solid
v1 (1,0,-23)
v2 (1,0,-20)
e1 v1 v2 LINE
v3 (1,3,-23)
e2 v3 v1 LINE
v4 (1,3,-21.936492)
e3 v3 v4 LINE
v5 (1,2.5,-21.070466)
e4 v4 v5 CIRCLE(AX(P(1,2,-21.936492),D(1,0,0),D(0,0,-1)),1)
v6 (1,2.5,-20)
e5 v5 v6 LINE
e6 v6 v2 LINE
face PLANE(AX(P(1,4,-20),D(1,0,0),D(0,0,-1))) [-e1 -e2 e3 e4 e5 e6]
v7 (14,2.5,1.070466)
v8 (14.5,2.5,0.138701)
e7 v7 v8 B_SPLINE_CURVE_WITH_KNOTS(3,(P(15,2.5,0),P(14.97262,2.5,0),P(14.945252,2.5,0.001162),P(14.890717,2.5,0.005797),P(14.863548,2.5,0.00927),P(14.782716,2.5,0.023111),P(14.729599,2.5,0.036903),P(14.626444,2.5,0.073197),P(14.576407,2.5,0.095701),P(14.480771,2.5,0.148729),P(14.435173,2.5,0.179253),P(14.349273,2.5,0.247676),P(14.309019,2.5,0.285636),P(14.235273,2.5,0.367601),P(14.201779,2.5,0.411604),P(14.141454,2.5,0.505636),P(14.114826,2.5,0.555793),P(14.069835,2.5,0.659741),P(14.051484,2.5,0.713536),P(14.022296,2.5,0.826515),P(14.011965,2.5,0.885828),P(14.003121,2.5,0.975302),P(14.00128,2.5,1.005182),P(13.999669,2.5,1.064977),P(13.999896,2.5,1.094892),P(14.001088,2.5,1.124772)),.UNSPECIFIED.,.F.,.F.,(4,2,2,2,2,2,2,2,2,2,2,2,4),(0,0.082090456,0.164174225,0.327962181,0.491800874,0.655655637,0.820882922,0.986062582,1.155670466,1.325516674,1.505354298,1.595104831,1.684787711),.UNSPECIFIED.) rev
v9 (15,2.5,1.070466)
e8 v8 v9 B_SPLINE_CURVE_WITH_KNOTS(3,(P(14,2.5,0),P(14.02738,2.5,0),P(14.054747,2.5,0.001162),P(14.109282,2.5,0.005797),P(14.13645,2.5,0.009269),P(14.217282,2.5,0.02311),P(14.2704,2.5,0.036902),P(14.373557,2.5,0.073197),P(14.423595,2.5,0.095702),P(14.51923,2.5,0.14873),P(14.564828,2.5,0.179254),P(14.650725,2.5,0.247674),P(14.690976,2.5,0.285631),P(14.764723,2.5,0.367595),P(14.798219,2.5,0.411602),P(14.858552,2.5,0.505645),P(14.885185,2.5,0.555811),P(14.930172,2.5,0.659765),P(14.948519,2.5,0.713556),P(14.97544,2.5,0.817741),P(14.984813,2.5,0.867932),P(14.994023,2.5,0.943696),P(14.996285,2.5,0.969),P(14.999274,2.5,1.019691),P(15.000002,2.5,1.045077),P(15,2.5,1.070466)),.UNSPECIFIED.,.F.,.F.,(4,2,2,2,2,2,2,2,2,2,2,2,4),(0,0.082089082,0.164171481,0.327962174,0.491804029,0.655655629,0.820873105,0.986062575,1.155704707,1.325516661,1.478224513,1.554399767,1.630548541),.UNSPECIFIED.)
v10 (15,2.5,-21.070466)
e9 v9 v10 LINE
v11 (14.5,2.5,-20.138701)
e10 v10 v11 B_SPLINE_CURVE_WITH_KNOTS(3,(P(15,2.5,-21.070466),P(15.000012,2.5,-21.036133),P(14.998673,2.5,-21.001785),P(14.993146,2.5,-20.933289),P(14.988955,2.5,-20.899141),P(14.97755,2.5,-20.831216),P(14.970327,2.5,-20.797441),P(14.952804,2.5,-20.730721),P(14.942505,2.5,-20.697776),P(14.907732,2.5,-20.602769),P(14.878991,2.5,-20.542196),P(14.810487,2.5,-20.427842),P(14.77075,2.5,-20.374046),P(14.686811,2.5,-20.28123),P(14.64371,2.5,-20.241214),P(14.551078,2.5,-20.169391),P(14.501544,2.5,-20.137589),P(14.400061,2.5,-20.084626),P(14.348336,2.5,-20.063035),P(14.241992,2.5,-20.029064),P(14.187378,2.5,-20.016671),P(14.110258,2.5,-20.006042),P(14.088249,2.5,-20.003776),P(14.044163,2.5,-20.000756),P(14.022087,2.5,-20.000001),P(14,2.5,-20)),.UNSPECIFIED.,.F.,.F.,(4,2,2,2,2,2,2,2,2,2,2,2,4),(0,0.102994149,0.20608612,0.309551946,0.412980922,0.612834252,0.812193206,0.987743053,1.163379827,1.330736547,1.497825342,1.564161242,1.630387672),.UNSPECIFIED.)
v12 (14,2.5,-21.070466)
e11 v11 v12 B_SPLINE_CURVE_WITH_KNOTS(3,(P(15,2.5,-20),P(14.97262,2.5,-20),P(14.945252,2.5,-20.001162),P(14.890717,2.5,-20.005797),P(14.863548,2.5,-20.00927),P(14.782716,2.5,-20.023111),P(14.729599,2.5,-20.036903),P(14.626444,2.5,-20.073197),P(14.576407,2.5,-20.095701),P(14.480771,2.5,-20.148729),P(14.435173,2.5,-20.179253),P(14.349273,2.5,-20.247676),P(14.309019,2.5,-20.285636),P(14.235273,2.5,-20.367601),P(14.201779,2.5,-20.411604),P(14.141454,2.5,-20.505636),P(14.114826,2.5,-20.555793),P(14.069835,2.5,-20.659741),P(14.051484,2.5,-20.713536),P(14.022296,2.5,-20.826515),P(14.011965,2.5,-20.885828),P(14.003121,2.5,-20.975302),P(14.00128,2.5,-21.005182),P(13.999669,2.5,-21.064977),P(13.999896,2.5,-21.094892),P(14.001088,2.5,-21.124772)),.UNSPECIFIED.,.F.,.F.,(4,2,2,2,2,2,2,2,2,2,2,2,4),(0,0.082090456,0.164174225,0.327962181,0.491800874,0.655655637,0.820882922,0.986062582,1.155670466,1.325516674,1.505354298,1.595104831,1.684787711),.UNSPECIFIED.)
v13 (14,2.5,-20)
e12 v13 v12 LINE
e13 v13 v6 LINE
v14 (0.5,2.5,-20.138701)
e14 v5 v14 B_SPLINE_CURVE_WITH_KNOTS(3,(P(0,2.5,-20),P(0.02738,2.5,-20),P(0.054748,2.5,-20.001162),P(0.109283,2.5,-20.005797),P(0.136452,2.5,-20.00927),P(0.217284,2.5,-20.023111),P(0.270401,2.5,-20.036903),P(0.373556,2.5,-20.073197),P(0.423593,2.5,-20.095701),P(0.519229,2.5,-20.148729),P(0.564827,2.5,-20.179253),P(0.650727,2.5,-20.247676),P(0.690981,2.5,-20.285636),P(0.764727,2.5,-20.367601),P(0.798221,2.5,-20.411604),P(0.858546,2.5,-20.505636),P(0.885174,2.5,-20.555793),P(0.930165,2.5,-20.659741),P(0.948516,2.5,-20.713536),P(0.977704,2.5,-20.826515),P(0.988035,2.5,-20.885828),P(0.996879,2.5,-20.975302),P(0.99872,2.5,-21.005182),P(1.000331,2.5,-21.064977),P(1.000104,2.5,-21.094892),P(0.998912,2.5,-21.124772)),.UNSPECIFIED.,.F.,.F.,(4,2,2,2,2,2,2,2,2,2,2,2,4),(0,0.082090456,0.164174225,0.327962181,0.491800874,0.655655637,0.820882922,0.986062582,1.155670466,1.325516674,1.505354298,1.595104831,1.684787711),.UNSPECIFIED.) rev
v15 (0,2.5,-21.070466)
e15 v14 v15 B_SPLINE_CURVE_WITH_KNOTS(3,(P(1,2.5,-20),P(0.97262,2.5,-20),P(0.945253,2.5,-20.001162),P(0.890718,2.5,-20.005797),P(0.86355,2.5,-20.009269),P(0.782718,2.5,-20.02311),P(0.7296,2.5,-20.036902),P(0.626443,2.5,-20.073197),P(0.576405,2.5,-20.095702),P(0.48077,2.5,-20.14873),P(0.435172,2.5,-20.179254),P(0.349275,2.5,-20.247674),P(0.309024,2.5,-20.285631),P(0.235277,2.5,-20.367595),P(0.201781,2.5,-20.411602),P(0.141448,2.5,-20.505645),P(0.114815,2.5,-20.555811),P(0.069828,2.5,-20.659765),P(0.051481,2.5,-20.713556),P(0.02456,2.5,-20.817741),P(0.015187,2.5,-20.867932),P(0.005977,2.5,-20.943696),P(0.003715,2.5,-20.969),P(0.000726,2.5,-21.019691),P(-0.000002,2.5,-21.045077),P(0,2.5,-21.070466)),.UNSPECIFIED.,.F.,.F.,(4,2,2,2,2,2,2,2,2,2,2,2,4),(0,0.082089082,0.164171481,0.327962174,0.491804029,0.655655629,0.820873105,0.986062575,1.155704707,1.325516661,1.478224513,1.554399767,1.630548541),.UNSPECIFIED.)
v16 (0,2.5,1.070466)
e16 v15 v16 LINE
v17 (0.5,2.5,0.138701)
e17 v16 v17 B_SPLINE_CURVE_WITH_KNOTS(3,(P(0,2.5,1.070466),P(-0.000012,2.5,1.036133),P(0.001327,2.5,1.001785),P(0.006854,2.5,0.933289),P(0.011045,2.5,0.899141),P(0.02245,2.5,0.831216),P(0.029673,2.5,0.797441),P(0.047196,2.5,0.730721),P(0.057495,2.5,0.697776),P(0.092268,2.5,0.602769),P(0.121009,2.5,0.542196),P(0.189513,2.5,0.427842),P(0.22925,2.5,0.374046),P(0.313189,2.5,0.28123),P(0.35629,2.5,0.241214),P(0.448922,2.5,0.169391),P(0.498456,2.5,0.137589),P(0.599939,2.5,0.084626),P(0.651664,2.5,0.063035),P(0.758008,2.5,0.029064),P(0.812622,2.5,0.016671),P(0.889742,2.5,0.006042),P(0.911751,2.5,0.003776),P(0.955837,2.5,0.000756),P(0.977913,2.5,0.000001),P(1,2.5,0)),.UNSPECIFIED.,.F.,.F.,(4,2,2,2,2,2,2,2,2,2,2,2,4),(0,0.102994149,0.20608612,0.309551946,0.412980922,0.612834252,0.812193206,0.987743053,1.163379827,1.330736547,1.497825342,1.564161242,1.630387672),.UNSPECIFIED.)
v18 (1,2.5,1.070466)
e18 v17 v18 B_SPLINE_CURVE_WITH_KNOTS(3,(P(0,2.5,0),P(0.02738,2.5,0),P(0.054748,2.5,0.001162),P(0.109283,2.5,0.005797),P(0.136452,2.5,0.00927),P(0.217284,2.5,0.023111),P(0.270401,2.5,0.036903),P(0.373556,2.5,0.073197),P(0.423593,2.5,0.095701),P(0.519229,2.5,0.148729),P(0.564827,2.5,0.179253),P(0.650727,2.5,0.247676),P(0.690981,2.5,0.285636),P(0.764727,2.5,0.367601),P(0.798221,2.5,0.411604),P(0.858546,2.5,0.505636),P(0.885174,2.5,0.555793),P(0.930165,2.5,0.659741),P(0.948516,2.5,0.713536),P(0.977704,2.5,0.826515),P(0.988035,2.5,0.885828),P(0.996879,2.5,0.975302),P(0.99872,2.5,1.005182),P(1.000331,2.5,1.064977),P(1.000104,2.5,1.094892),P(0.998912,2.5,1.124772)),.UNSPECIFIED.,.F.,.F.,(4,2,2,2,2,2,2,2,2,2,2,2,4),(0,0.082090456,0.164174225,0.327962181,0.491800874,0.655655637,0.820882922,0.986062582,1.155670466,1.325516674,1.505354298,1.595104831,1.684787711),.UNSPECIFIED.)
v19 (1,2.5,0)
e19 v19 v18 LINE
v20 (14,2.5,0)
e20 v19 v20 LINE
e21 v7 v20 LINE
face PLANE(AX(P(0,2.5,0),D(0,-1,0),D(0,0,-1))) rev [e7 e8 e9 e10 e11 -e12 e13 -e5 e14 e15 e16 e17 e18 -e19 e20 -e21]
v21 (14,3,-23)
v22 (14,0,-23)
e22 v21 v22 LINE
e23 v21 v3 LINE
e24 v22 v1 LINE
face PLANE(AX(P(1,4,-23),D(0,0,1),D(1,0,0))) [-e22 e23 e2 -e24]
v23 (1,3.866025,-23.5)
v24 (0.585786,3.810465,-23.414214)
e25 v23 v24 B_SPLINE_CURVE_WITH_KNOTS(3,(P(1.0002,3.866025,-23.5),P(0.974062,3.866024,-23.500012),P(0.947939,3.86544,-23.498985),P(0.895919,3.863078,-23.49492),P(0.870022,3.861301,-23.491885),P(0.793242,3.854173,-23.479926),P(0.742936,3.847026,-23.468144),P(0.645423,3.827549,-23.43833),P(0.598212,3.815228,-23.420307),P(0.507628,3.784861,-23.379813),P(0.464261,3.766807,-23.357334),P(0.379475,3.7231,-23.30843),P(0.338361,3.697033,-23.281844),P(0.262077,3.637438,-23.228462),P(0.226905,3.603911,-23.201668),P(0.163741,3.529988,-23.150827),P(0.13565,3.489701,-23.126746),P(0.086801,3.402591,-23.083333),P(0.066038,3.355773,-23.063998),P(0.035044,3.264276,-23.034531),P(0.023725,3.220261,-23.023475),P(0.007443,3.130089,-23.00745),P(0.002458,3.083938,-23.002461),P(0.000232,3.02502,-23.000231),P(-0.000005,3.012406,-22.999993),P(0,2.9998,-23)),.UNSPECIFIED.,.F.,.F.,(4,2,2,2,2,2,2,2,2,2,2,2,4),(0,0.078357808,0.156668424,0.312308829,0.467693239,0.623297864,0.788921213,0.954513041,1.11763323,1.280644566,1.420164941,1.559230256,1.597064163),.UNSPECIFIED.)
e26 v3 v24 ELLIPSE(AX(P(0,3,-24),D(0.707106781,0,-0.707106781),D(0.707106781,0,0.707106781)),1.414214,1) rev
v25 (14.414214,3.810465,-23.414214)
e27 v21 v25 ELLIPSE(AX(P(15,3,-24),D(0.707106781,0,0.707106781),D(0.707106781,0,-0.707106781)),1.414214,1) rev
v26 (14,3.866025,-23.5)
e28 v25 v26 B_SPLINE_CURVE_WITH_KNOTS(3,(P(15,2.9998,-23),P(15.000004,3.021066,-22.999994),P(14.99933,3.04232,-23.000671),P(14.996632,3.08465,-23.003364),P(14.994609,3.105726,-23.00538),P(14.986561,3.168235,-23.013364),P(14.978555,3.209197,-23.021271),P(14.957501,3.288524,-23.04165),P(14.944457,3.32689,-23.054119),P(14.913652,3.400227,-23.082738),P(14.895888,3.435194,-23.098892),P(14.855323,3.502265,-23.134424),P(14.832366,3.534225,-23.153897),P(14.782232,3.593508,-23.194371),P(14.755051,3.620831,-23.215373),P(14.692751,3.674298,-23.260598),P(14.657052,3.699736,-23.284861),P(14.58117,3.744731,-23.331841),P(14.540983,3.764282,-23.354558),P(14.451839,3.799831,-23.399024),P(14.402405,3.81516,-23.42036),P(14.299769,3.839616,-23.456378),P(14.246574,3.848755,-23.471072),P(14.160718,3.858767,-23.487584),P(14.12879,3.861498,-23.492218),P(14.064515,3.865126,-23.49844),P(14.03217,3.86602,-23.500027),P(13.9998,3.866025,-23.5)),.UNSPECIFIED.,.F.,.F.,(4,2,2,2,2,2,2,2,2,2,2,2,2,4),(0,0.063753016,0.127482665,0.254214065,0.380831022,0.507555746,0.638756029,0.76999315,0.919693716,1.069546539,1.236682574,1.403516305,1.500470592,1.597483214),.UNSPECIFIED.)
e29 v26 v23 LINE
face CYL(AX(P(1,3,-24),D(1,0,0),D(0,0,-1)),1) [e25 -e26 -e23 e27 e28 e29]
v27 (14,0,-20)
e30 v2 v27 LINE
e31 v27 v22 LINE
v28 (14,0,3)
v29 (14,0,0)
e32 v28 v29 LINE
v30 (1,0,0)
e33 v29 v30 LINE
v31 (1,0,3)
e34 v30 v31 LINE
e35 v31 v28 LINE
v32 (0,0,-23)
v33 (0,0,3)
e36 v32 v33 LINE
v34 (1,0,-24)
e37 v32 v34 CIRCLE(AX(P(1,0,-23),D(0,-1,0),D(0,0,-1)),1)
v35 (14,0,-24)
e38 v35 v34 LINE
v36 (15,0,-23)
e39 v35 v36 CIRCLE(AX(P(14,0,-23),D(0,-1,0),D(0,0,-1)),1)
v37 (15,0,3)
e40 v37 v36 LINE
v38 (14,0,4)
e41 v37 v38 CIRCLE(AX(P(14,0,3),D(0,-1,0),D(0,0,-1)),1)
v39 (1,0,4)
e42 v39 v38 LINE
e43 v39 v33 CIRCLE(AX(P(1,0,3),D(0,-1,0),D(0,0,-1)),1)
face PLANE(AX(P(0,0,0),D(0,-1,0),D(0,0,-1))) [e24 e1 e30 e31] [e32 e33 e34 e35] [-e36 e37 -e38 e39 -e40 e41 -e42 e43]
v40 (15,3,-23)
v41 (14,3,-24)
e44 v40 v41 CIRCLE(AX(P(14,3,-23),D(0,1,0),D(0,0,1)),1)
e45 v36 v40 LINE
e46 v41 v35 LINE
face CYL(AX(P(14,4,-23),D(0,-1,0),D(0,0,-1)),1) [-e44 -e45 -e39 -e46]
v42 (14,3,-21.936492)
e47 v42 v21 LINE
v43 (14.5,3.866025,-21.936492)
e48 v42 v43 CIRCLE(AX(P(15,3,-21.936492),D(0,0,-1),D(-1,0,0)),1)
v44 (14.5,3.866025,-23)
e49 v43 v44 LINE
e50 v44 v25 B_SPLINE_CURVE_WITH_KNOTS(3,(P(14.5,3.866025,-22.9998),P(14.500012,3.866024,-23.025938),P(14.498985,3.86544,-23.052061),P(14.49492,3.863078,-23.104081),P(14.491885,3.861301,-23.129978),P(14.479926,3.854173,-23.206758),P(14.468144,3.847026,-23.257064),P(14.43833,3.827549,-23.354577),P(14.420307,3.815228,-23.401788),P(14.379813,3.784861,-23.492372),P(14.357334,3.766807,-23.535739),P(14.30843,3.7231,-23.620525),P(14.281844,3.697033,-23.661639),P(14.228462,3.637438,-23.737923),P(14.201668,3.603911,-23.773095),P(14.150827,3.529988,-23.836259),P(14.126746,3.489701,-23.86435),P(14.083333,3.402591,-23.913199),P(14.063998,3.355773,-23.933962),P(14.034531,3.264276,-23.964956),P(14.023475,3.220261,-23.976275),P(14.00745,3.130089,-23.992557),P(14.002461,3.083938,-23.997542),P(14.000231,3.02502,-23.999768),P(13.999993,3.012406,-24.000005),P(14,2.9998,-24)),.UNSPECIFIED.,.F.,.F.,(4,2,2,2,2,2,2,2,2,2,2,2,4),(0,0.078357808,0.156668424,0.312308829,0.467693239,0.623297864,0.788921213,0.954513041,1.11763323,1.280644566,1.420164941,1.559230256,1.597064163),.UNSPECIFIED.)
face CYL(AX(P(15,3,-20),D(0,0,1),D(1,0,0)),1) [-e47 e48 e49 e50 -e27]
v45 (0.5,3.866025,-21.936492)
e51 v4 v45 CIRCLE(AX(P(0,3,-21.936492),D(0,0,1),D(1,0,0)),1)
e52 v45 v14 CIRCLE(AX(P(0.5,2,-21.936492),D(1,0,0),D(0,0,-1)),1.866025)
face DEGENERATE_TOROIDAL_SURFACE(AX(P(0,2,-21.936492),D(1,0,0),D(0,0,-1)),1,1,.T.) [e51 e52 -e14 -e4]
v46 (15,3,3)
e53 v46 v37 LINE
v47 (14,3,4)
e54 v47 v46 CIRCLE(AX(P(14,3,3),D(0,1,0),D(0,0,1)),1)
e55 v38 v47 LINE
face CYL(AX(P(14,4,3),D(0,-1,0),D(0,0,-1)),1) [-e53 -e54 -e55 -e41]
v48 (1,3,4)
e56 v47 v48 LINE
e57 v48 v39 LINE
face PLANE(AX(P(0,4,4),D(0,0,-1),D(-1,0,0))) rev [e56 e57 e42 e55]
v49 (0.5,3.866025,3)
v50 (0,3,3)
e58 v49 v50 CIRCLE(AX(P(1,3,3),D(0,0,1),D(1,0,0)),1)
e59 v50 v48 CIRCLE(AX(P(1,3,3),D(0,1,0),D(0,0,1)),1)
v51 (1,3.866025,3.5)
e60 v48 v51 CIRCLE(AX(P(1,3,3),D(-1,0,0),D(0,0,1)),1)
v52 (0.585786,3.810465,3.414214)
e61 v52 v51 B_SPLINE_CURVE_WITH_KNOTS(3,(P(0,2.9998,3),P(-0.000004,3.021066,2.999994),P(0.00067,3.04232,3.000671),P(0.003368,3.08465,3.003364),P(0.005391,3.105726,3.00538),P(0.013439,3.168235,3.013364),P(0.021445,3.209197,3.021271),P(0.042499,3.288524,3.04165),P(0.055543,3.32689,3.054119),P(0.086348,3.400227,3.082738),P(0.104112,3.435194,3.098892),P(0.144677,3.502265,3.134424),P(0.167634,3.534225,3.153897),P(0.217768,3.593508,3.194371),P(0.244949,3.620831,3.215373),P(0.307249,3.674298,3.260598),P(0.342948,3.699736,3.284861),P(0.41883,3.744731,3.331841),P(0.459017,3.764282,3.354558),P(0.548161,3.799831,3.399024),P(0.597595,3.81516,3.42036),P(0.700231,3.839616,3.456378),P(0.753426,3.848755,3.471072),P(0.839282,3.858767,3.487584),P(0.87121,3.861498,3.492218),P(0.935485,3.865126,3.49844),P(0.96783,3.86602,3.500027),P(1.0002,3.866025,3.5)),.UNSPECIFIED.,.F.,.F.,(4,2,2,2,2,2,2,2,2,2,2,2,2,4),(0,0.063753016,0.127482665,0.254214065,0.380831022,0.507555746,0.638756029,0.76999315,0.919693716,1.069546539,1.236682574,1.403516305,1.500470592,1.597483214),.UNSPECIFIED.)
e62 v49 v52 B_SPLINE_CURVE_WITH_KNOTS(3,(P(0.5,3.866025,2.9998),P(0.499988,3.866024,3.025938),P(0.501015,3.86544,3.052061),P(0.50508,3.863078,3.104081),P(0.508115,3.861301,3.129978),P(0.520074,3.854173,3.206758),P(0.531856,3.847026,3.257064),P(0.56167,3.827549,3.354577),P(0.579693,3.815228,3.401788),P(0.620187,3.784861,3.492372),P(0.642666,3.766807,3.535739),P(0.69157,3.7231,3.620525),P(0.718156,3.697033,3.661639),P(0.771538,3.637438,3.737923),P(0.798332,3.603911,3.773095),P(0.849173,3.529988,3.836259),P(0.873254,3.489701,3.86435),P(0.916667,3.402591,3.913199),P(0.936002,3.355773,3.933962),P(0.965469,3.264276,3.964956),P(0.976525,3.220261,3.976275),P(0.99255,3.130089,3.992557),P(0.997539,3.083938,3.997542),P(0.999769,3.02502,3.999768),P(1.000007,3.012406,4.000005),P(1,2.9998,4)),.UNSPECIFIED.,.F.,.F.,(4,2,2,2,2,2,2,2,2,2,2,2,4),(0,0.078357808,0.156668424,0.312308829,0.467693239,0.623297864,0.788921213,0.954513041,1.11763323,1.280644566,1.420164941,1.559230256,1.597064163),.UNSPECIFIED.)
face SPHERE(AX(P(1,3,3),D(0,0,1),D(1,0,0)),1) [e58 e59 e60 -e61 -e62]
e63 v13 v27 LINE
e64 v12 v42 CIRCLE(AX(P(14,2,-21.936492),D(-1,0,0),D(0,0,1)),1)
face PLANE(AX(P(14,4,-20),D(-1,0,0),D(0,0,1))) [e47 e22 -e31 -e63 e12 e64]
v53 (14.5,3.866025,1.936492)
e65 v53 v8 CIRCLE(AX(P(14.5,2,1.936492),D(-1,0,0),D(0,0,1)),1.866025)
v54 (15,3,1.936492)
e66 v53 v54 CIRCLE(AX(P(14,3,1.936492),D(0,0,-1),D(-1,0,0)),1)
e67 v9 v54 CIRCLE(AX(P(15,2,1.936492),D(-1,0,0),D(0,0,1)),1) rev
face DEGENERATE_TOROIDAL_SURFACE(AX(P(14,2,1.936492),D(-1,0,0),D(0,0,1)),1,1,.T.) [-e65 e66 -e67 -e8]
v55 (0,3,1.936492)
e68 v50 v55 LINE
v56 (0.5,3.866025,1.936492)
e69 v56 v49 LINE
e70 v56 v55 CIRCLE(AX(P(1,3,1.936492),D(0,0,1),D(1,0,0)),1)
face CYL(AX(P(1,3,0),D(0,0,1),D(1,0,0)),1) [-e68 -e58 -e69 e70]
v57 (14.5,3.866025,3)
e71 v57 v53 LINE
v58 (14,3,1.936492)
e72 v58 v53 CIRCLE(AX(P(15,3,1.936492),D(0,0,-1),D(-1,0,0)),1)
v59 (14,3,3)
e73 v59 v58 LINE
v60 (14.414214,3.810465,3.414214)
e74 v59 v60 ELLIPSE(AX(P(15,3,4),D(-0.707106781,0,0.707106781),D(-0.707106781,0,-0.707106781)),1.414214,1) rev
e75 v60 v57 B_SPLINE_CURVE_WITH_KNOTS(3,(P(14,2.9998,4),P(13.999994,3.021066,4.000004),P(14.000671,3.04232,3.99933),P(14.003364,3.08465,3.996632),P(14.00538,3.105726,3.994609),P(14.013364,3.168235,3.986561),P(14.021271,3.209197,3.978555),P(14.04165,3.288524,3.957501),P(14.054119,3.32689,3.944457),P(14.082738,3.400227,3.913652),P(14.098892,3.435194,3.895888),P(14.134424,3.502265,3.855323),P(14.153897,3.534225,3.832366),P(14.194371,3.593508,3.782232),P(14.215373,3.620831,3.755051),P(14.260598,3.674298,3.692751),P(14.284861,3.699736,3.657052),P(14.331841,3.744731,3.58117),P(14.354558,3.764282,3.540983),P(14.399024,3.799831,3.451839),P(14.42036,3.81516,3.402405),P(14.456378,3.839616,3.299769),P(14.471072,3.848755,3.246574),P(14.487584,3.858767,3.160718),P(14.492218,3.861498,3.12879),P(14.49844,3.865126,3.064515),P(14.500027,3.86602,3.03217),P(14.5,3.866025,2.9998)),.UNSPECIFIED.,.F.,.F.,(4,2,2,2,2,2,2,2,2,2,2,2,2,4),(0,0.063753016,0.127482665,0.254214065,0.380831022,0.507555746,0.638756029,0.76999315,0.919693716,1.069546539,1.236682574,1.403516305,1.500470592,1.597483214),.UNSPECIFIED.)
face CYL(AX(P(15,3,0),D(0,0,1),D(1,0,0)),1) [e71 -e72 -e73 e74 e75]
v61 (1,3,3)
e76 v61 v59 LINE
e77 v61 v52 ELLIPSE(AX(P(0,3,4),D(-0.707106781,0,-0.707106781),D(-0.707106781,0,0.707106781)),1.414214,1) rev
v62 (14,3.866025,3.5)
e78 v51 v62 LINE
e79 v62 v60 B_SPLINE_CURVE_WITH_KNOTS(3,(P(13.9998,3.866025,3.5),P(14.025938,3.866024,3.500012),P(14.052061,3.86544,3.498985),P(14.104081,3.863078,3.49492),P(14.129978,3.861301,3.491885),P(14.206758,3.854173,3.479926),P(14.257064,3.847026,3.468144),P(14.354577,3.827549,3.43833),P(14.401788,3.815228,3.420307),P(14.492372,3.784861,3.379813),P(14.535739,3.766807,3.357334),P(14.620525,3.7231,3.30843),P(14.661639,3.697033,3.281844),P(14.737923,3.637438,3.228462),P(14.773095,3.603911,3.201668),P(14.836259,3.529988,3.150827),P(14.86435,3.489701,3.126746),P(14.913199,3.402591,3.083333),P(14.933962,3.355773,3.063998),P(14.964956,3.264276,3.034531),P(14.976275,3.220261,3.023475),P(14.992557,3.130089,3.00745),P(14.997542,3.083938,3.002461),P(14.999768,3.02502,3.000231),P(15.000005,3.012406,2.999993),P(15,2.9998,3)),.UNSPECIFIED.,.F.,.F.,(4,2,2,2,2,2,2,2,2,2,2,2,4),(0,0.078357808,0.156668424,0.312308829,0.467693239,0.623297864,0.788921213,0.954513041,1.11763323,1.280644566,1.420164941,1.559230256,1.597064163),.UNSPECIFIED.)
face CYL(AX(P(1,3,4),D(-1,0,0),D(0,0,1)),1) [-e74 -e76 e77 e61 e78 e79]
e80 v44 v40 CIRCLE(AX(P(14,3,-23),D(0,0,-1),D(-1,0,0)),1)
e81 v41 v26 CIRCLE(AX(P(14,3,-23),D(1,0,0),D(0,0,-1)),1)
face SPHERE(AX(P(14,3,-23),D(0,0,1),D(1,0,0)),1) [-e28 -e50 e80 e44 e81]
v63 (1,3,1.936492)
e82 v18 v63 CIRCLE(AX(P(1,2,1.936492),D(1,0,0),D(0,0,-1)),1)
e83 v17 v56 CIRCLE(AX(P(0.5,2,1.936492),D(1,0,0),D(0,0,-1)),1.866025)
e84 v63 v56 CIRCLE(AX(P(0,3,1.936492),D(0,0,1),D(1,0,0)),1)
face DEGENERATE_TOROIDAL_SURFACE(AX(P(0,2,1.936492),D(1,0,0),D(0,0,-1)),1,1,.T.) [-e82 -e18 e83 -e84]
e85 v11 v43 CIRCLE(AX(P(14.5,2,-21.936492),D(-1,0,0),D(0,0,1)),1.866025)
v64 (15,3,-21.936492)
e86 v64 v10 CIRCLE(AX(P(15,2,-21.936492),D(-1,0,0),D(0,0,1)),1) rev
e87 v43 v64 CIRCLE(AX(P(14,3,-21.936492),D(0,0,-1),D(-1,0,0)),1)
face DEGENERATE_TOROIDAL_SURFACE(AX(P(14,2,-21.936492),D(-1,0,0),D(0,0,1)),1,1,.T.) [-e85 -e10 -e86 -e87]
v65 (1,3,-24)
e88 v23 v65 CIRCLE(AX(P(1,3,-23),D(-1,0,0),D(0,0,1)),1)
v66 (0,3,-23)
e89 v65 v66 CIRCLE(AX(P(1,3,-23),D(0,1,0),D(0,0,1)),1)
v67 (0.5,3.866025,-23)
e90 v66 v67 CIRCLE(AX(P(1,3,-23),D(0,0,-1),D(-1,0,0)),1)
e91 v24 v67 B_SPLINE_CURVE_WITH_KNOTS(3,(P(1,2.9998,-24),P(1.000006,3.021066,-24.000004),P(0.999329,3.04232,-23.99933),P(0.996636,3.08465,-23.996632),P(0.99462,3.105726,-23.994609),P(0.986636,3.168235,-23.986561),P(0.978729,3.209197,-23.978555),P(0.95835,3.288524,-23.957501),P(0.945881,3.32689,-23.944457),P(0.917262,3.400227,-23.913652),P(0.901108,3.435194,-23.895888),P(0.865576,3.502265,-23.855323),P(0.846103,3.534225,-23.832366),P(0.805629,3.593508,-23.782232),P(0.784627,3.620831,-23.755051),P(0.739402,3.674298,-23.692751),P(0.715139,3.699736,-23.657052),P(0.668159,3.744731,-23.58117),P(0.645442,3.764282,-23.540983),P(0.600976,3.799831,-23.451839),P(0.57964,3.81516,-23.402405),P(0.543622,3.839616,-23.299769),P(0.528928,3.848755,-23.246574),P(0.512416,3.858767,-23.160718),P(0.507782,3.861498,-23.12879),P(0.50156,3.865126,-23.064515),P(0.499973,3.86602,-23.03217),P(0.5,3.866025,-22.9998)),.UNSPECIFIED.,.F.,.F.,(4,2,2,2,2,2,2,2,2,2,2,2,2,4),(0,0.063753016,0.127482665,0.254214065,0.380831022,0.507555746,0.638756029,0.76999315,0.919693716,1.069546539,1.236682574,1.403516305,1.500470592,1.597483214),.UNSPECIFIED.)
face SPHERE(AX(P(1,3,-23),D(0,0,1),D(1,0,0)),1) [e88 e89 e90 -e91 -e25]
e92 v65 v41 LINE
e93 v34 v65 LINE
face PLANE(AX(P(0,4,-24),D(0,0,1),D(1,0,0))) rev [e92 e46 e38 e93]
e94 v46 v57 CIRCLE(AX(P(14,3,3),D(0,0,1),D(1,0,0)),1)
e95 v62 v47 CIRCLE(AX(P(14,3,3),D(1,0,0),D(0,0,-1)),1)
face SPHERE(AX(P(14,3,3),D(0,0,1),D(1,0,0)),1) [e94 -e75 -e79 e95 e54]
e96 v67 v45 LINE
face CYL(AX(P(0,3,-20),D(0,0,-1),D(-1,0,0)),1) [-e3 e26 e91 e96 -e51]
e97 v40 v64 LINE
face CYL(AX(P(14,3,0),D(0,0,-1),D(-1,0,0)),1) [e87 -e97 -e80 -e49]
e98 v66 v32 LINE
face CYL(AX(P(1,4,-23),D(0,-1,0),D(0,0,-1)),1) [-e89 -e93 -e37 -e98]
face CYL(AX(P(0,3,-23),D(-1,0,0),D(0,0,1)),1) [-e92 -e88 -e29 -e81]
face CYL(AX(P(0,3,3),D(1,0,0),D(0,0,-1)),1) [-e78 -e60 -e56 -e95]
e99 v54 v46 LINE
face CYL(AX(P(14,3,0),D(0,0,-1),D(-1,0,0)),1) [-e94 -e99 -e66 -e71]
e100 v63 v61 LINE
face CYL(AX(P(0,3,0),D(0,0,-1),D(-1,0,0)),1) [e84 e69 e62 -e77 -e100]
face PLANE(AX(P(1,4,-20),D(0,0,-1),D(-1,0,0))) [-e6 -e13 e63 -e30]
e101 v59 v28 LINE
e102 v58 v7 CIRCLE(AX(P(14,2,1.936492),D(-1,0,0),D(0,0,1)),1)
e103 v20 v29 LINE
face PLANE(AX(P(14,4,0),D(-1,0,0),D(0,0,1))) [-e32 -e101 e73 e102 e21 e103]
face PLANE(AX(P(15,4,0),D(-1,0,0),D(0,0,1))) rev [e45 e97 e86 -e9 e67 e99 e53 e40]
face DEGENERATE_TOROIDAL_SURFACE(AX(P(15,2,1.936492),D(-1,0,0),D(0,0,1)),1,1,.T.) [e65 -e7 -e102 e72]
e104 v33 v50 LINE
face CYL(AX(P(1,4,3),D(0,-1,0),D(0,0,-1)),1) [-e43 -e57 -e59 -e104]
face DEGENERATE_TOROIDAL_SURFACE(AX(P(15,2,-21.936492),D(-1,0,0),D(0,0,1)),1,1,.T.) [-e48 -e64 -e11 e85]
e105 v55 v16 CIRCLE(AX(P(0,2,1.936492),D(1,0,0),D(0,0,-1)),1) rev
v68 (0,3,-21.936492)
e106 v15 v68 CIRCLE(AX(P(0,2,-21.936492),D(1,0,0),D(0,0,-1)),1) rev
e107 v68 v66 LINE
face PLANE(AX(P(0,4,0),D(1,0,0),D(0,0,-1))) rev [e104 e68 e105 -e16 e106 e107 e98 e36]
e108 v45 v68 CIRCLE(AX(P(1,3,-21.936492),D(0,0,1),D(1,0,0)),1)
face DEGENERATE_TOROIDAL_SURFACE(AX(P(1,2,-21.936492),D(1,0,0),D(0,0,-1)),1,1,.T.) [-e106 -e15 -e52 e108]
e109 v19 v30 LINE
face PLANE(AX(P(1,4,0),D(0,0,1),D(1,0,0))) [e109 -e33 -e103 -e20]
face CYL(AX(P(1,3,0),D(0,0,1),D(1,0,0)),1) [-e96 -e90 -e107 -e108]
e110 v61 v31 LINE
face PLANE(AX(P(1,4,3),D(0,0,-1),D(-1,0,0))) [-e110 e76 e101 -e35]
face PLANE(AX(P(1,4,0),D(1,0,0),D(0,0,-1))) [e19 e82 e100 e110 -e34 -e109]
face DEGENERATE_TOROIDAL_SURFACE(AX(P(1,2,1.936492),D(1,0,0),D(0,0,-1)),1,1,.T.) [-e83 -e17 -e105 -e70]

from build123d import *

# Parameters (mm, degrees)
SKETCH1_W           = 13
SKETCH1_H           = 3
BOSS_EXTRUDE1_DEPTH = 4
SKETCH2_W           = 15
SKETCH2_H           = 20
CUT_EXTRUDE1_DEPTH  = 1.5
FILLET1_R           = 2
FILLET2_R           = 1


with BuildPart() as part:
    # Sketch1 → Boss-Extrude1 (new body)
    with BuildSketch(Plane(origin=(0, 0, 0), x_dir=(1, 0, 0), z_dir=(0, 1, 0))):
        Polygon((0, 0), (0, 20), (0, 24), (15, 24), (15, 20), (15, 0), (15, -4), (0, -4), align=None)
        with Locations((7.5, 21.5)):
            Rectangle(SKETCH1_W, SKETCH1_H, mode=Mode.SUBTRACT)
        with Locations((7.5, -1.5)):
            Rectangle(SKETCH1_W, SKETCH1_H, mode=Mode.SUBTRACT)
    extrude(amount=BOSS_EXTRUDE1_DEPTH)

    # Sketch2 → Cut-Extrude1 (cut)
    with BuildSketch(Plane(origin=(0, 4, 0), x_dir=(1, 0, 0), z_dir=(0, 1, 0))):
        with Locations((7.5, 10)):
            Rectangle(SKETCH2_W, SKETCH2_H)
    extrude(amount=-CUT_EXTRUDE1_DEPTH, mode=Mode.SUBTRACT)

    # Fillet1
    # the kernel refuses this fillet: 2 mm, written as the material it takes off along each edge
    with BuildSketch(Plane(origin=(-4.841229183, 4, 0), x_dir=(0, -1, 0), z_dir=(1, 0, 0))) as fillet1_piece_1:
        with BuildLine():
            CenterArc((2, -1.936491673), FILLET1_R, 104.477512186, 75.522487814)
            Line((0, -1.936491673), (-0.04, -1.936491673))
            Line((-0.04, -1.936491673), (-0.04, 0))
            Line((-0.04, 0), (0, 0.04))
            ThreePointArc((0, 0.04), (0.75, 0.04), (1.49, 0.038729833))
            Line((1.49, 0.038729833), (1.5, 0))
        make_face()
    extrude(amount=10.682458366, mode=Mode.SUBTRACT)
    with BuildSketch(Plane(origin=(9.158770817, 4, 0), x_dir=(0, 0, 1), z_dir=(1, 0, 0)), Plane(origin=(19.841229183, 4, -20), x_dir=(0, 0, -1), z_dir=(-1, 0, 0)), Plane(origin=(5.841229183, 4, -20), x_dir=(0, 0, -1), z_dir=(-1, 0, 0))) as fillet1_piece_2:
        with BuildLine():
            CenterArc((1.936491673, 2), FILLET1_R, 194.477512186, 75.522487814)
            Line((0, 1.5), (-0.038729833, 1.49))
            ThreePointArc((-0.038729833, 1.49), (-0.04, 0.75), (-0.04, 0))
            Line((-0.04, 0), (0, -0.04))
            Line((0, -0.04), (1.936491673, -0.04))
            Line((1.936491673, -0.04), (1.936491673, 0))
        make_face()
    extrude(amount=10.682458366, mode=Mode.SUBTRACT)

    # Fillet2
    # the kernel refuses this fillet: 1 mm, written as the material it takes off along each edge
    with BuildSketch(Plane(origin=(14, 3, 3), x_dir=(0, 0, 1), z_dir=(1, 0, 0))) as fillet2_piece_1_section:
        Polygon((0, 0), (FILLET2_R * 1.02, 0), (FILLET2_R * 1.02, -FILLET2_R * 1.02), (0, -FILLET2_R * 1.02), align=None)
    fillet2_piece_1 = extrude(amount=FILLET2_R * 1.02, mode=Mode.PRIVATE)
    fillet2_piece_1 = fillet2_piece_1 - Plane(origin=(14, 3, 3), x_dir=(0, -0.7071067811865475, -0.7071067811865475), z_dir=(1, 0, 0)) * Sphere(FILLET2_R, mode=Mode.PRIVATE)
    add(fillet2_piece_1, mode=Mode.SUBTRACT)
    with BuildSketch(Plane(origin=(1, 3, 3), x_dir=(0, 0, 1), z_dir=(-1, 0, 0))) as fillet2_piece_2_section:
        Polygon((0, 0), (FILLET2_R * 1.02, 0), (FILLET2_R * 1.02, FILLET2_R * 1.02), (0, FILLET2_R * 1.02), align=None)
    fillet2_piece_2 = extrude(amount=FILLET2_R * 1.02, mode=Mode.PRIVATE)
    fillet2_piece_2 = fillet2_piece_2 - Plane(origin=(1, 3, 3), x_dir=(0, -0.7071067811865475, -0.7071067811865475), z_dir=(-1, 0, 0)) * Sphere(FILLET2_R, mode=Mode.PRIVATE)
    add(fillet2_piece_2, mode=Mode.SUBTRACT)
    with BuildSketch(Plane(origin=(1, 3, -23), x_dir=(0, 1, 0), z_dir=(-1, 0, 0))) as fillet2_piece_3_section:
        Polygon((0, 0), (FILLET2_R * 1.02, 0), (FILLET2_R * 1.02, FILLET2_R * 1.02), (0, FILLET2_R * 1.02), align=None)
    fillet2_piece_3 = extrude(amount=FILLET2_R * 1.02, mode=Mode.PRIVATE)
    fillet2_piece_3 = fillet2_piece_3 - Plane(origin=(1, 3, -23), x_dir=(0, -0.7071067811865475, 0.7071067811865475), z_dir=(-1, 0, 0)) * Sphere(FILLET2_R, mode=Mode.PRIVATE)
    add(fillet2_piece_3, mode=Mode.SUBTRACT)
    with BuildSketch(Plane(origin=(14, 3, -23), x_dir=(0, 0, -1), z_dir=(0, 1, 0))) as fillet2_piece_4_section:
        Polygon((0, 0), (FILLET2_R * 1.02, 0), (FILLET2_R * 1.02, -FILLET2_R * 1.02), (0, -FILLET2_R * 1.02), align=None)
    fillet2_piece_4 = extrude(amount=FILLET2_R * 1.02, mode=Mode.PRIVATE)
    fillet2_piece_4 = fillet2_piece_4 - Plane(origin=(14, 3, -23), x_dir=(-0.7071067811865475, 0, 0.7071067811865475), z_dir=(0, 1, 0)) * Sphere(FILLET2_R, mode=Mode.PRIVATE)
    add(fillet2_piece_4, mode=Mode.SUBTRACT)
    with BuildSketch(Plane(origin=(14, 2, 1.936491673), x_dir=(0, 1, 0), z_dir=(0, 0, 1))) as fillet2_piece_5_section:
        with BuildLine():
            CenterArc((2 - FILLET2_R, -FILLET2_R), FILLET2_R, 0, 90)
            Line((2, -FILLET2_R), (2 + FILLET2_R * 0.02, -FILLET2_R))
            Line((2 + FILLET2_R * 0.02, -FILLET2_R), (2 + FILLET2_R * 0.02, FILLET2_R * 0.02))
            Line((2 + FILLET2_R * 0.02, FILLET2_R * 0.02), (2 - FILLET2_R, FILLET2_R * 0.02))
            Line((2 - FILLET2_R, FILLET2_R * 0.02), (2 - FILLET2_R, 0))
        make_face()
    fillet2_piece_5 = revolve(axis=Axis((14, 2, 1.936491673), (-1, 0, 0)), revolution_arc=147.162469187, mode=Mode.PRIVATE)
    fillet2_piece_5 = split(fillet2_piece_5, bisect_by=Plane(origin=(14.245105453, 3.345971108, 0), z_dir=(0, 0, 1)), keep=Keep.TOP, mode=Mode.PRIVATE)
    fillet2_piece_5 = split(fillet2_piece_5, bisect_by=Plane(origin=(14.245105453, 2.5, 0.926068322), z_dir=(0, 1, 0)), keep=Keep.TOP, mode=Mode.PRIVATE)
    add(fillet2_piece_5, mode=Mode.SUBTRACT)
    with BuildSketch(Plane(origin=(15, 2, 1.936491673), x_dir=(0, 1, 0), z_dir=(0, 0, 1))) as fillet2_piece_6_section:
        with BuildLine():
            CenterArc((2 - FILLET2_R, FILLET2_R), FILLET2_R, 270, 90)
            Line((2 - FILLET2_R, 0), (2 - FILLET2_R, -FILLET2_R * 0.02))
            Line((2 - FILLET2_R, -FILLET2_R * 0.02), (2 + FILLET2_R * 0.02, -FILLET2_R * 0.02))
            Line((2 + FILLET2_R * 0.02, -FILLET2_R * 0.02), (2 + FILLET2_R * 0.02, FILLET2_R))
            Line((2 + FILLET2_R * 0.02, FILLET2_R), (2, FILLET2_R))
        make_face()
    fillet2_piece_6 = revolve(axis=Axis((15, 2, 1.936491673), (-1, 0, 0)), revolution_arc=147.162469187, mode=Mode.PRIVATE)
    fillet2_piece_6 = split(fillet2_piece_6, bisect_by=Plane(origin=(14.754554239, 2.5, 0.924771773), z_dir=(0, 1, 0)), keep=Keep.TOP, mode=Mode.PRIVATE)
    add(fillet2_piece_6, mode=Mode.SUBTRACT)
    with BuildSketch(Plane(origin=(0, 2, 1.936491673), x_dir=(0, 1, 0), z_dir=(0, 0, 1))) as fillet2_piece_7_section:
        with BuildLine():
            CenterArc((2 - FILLET2_R, -FILLET2_R), FILLET2_R, 0, 90)
            Line((2, -FILLET2_R), (2 + FILLET2_R * 0.02, -FILLET2_R))
            Line((2 + FILLET2_R * 0.02, -FILLET2_R), (2 + FILLET2_R * 0.02, FILLET2_R * 0.02))
            Line((2 + FILLET2_R * 0.02, FILLET2_R * 0.02), (2 - FILLET2_R, FILLET2_R * 0.02))
            Line((2 - FILLET2_R, FILLET2_R * 0.02), (2 - FILLET2_R, 0))
        make_face()
    fillet2_piece_7 = revolve(axis=Axis((0, 2, 1.936491673), (-1, 0, 0)), revolution_arc=147.162469187, mode=Mode.PRIVATE)
    fillet2_piece_7 = split(fillet2_piece_7, bisect_by=Plane(origin=(0.245445759, 2.5, 0.924771781), z_dir=(0, 1, 0)), keep=Keep.TOP, mode=Mode.PRIVATE)
    add(fillet2_piece_7, mode=Mode.SUBTRACT)
    with BuildSketch(Plane(origin=(1, 2, 1.936491673), x_dir=(0, 1, 0), z_dir=(0, 0, 1))) as fillet2_piece_8_section:
        with BuildLine():
            CenterArc((2 - FILLET2_R, FILLET2_R), FILLET2_R, 270, 90)
            Line((2, FILLET2_R), (2 + FILLET2_R * 0.02, FILLET2_R))
            Line((2 + FILLET2_R * 0.02, FILLET2_R), (2 + FILLET2_R * 0.02, -FILLET2_R * 0.02))
            Line((2 + FILLET2_R * 0.02, -FILLET2_R * 0.02), (2 - FILLET2_R, -FILLET2_R * 0.02))
            Line((2 - FILLET2_R, -FILLET2_R * 0.02), (2 - FILLET2_R, 0))
        make_face()
    fillet2_piece_8 = revolve(axis=Axis((1, 2, 1.936491673), (-1, 0, 0)), revolution_arc=147.162469187, mode=Mode.PRIVATE)
    fillet2_piece_8 = split(fillet2_piece_8, bisect_by=Plane(origin=(0.754894544, 3.345971097, 0), z_dir=(0, 0, 1)), keep=Keep.TOP, mode=Mode.PRIVATE)
    fillet2_piece_8 = split(fillet2_piece_8, bisect_by=Plane(origin=(0.754894544, 2.5, 0.926068314), z_dir=(0, 1, 0)), keep=Keep.TOP, mode=Mode.PRIVATE)
    add(fillet2_piece_8, mode=Mode.SUBTRACT)
    with BuildSketch(Plane(origin=(1, 2, -21.936491673), x_dir=(0, 1, 0), z_dir=(0, 0, -1))) as fillet2_piece_9_section:
        with BuildLine():
            CenterArc((2 - FILLET2_R, -FILLET2_R), FILLET2_R, 0, 90)
            Line((2, -FILLET2_R), (2 + FILLET2_R * 0.02, -FILLET2_R))
            Line((2 + FILLET2_R * 0.02, -FILLET2_R), (2 + FILLET2_R * 0.02, FILLET2_R * 0.02))
            Line((2 + FILLET2_R * 0.02, FILLET2_R * 0.02), (2 - FILLET2_R, FILLET2_R * 0.02))
            Line((2 - FILLET2_R, FILLET2_R * 0.02), (2 - FILLET2_R, 0))
        make_face()
    fillet2_piece_9 = revolve(axis=Axis((1, 2, -21.936491673), (1, 0, 0)), revolution_arc=147.162469187, mode=Mode.PRIVATE)
    fillet2_piece_9 = split(fillet2_piece_9, bisect_by=Plane(origin=(0.754894544, 3.345971097, -20), z_dir=(0, 0, -1)), keep=Keep.TOP, mode=Mode.PRIVATE)
    fillet2_piece_9 = split(fillet2_piece_9, bisect_by=Plane(origin=(0.754894544, 2.5, -20.926068314), z_dir=(0, 1, 0)), keep=Keep.TOP, mode=Mode.PRIVATE)
    add(fillet2_piece_9, mode=Mode.SUBTRACT)
    with BuildSketch(Plane(origin=(0, 2, -21.936491673), x_dir=(0, 1, 0), z_dir=(0, 0, -1))) as fillet2_piece_10_section:
        with BuildLine():
            CenterArc((2 - FILLET2_R, FILLET2_R), FILLET2_R, 270, 90)
            Line((2, FILLET2_R), (2 + FILLET2_R * 0.02, FILLET2_R))
            Line((2 + FILLET2_R * 0.02, FILLET2_R), (2 + FILLET2_R * 0.02, -FILLET2_R * 0.02))
            Line((2 + FILLET2_R * 0.02, -FILLET2_R * 0.02), (2 - FILLET2_R, -FILLET2_R * 0.02))
            Line((2 - FILLET2_R, -FILLET2_R * 0.02), (2 - FILLET2_R, 0))
        make_face()
    fillet2_piece_10 = revolve(axis=Axis((0, 2, -21.936491673), (1, 0, 0)), revolution_arc=147.162469187, mode=Mode.PRIVATE)
    fillet2_piece_10 = split(fillet2_piece_10, bisect_by=Plane(origin=(0.245445759, 2.5, -20.924771781), z_dir=(0, 1, 0)), keep=Keep.TOP, mode=Mode.PRIVATE)
    add(fillet2_piece_10, mode=Mode.SUBTRACT)
    with BuildSketch(Plane(origin=(15, 2, -21.936491673), x_dir=(0, 1, 0), z_dir=(0, 0, -1))) as fillet2_piece_11_section:
        with BuildLine():
            CenterArc((2 - FILLET2_R, -FILLET2_R), FILLET2_R, 0, 90)
            Line((2 - FILLET2_R, 0), (2 - FILLET2_R, FILLET2_R * 0.02))
            Line((2 - FILLET2_R, FILLET2_R * 0.02), (2 + FILLET2_R * 0.02, FILLET2_R * 0.02))
            Line((2 + FILLET2_R * 0.02, FILLET2_R * 0.02), (2 + FILLET2_R * 0.02, -FILLET2_R))
            Line((2 + FILLET2_R * 0.02, -FILLET2_R), (2, -FILLET2_R))
        make_face()
    fillet2_piece_11 = revolve(axis=Axis((15, 2, -21.936491673), (1, 0, 0)), revolution_arc=147.162469187, mode=Mode.PRIVATE)
    fillet2_piece_11 = split(fillet2_piece_11, bisect_by=Plane(origin=(14.754554239, 2.5, -20.924771773), z_dir=(0, 1, 0)), keep=Keep.TOP, mode=Mode.PRIVATE)
    add(fillet2_piece_11, mode=Mode.SUBTRACT)
    with BuildSketch(Plane(origin=(14, 2, -21.936491673), x_dir=(0, 1, 0), z_dir=(0, 0, -1))) as fillet2_piece_12_section:
        with BuildLine():
            CenterArc((2 - FILLET2_R, FILLET2_R), FILLET2_R, 270, 90)
            Line((2, FILLET2_R), (2 + FILLET2_R * 0.02, FILLET2_R))
            Line((2 + FILLET2_R * 0.02, FILLET2_R), (2 + FILLET2_R * 0.02, -FILLET2_R * 0.02))
            Line((2 + FILLET2_R * 0.02, -FILLET2_R * 0.02), (2 - FILLET2_R, -FILLET2_R * 0.02))
            Line((2 - FILLET2_R, -FILLET2_R * 0.02), (2 - FILLET2_R, 0))
        make_face()
    fillet2_piece_12 = revolve(axis=Axis((14, 2, -21.936491673), (1, 0, 0)), revolution_arc=147.162469187, mode=Mode.PRIVATE)
    fillet2_piece_12 = split(fillet2_piece_12, bisect_by=Plane(origin=(14.245105453, 3.345971108, -20), z_dir=(0, 0, -1)), keep=Keep.TOP, mode=Mode.PRIVATE)
    fillet2_piece_12 = split(fillet2_piece_12, bisect_by=Plane(origin=(14.245105453, 2.5, -20.926068322), z_dir=(0, 1, 0)), keep=Keep.TOP, mode=Mode.PRIVATE)
    add(fillet2_piece_12, mode=Mode.SUBTRACT)
    with BuildSketch(Plane(origin=(14, 4, 3), x_dir=(0, -1, 0), z_dir=(-1, 0, 0)), Plane(origin=(1, 4, -23), x_dir=(0, -1, 0), z_dir=(1, 0, 0)), Plane(origin=(1, 4, -24), x_dir=(0, 0, 1), z_dir=(1, 0, 0))) as fillet2_piece_13:
        with BuildLine():
            CenterArc((FILLET2_R, FILLET2_R), FILLET2_R, 180, 90)
            Line((0, FILLET2_R), (-FILLET2_R * 0.02, FILLET2_R))
            Line((-FILLET2_R * 0.02, FILLET2_R), (-FILLET2_R * 0.02, -FILLET2_R * 0.02))
            Line((-FILLET2_R * 0.02, -FILLET2_R * 0.02), (FILLET2_R, -FILLET2_R * 0.02))
            Line((FILLET2_R, -FILLET2_R * 0.02), (FILLET2_R, 0))
        make_face()
    extrude(amount=13, mode=Mode.SUBTRACT)
    with BuildSketch(Plane(origin=(14, 4, 1.936491673), x_dir=(0, -1, 0), z_dir=(0, 0, 1)), Plane(origin=(1, 4, 3), x_dir=(0, -1, 0), z_dir=(0, 0, -1)), Plane(origin=(1, 4, -21.936491673), x_dir=(0, -1, 0), z_dir=(0, 0, -1)), Plane(origin=(14, 4, -23), x_dir=(0, -1, 0), z_dir=(0, 0, 1))) as fillet2_piece_14:
        with BuildLine():
            CenterArc((FILLET2_R, FILLET2_R), FILLET2_R, 180, 90)
            Line((0, FILLET2_R), (-FILLET2_R * 0.02, FILLET2_R))
            Line((-FILLET2_R * 0.02, FILLET2_R), (-FILLET2_R * 0.02, -FILLET2_R * 0.02))
            Line((-FILLET2_R * 0.02, -FILLET2_R * 0.02), (FILLET2_R, -FILLET2_R * 0.02))
            Line((FILLET2_R, -FILLET2_R * 0.02), (FILLET2_R, 0))
        make_face()
    extrude(amount=1.063508327, mode=Mode.SUBTRACT)
    with BuildSketch(Plane(origin=(15, 4, 1.936491673), x_dir=(0, -1, 0), z_dir=(0, 0, 1)), Plane(origin=(0, 4, 3), x_dir=(0, -1, 0), z_dir=(0, 0, -1)), Plane(origin=(0, 4, -21.936491673), x_dir=(0, -1, 0), z_dir=(0, 0, -1)), Plane(origin=(15, 4, -23), x_dir=(0, -1, 0), z_dir=(0, 0, 1))) as fillet2_piece_15:
        with BuildLine():
            CenterArc((FILLET2_R, -FILLET2_R), FILLET2_R, 90, 90)
            Line((0, -FILLET2_R), (-FILLET2_R * 0.02, -FILLET2_R))
            Line((-FILLET2_R * 0.02, -FILLET2_R), (-FILLET2_R * 0.02, FILLET2_R * 0.02))
            Line((-FILLET2_R * 0.02, FILLET2_R * 0.02), (FILLET2_R, FILLET2_R * 0.02))
            Line((FILLET2_R, FILLET2_R * 0.02), (FILLET2_R, 0))
        make_face()
    extrude(amount=1.063508327, mode=Mode.SUBTRACT)
    with BuildSketch(Plane(origin=(14, 4, 4), x_dir=(0, -1, 0), z_dir=(-1, 0, 0))) as fillet2_piece_16:
        with BuildLine():
            CenterArc((FILLET2_R, -FILLET2_R), FILLET2_R, 90, 90)
            Line((0, -FILLET2_R), (-FILLET2_R * 0.02, -FILLET2_R))
            Line((-FILLET2_R * 0.02, -FILLET2_R), (-FILLET2_R * 0.02, FILLET2_R * 0.02))
            Line((-FILLET2_R * 0.02, FILLET2_R * 0.02), (FILLET2_R, FILLET2_R * 0.02))
            Line((FILLET2_R, FILLET2_R * 0.02), (FILLET2_R, 0))
        make_face()
    extrude(amount=13, mode=Mode.SUBTRACT)
    with BuildSketch(Plane(origin=(0, 0, -24), x_dir=(0, 0, 1), z_dir=(0, 1, 0)), Plane(origin=(15, 0, 4), x_dir=(0, 0, -1), z_dir=(0, 1, 0))) as fillet2_piece_17:
        with BuildLine():
            CenterArc((FILLET2_R, FILLET2_R), FILLET2_R, 180, 90)
            Line((0, FILLET2_R), (-FILLET2_R * 0.02, FILLET2_R))
            Line((-FILLET2_R * 0.02, FILLET2_R), (-FILLET2_R * 0.02, -FILLET2_R * 0.02))
            Line((-FILLET2_R * 0.02, -FILLET2_R * 0.02), (FILLET2_R, -FILLET2_R * 0.02))
            Line((FILLET2_R, -FILLET2_R * 0.02), (FILLET2_R, 0))
        make_face()
    extrude(amount=3, mode=Mode.SUBTRACT)
    with BuildSketch(Plane(origin=(15, 0, -24), x_dir=(0, 0, 1), z_dir=(0, 1, 0)), Plane(origin=(0, 0, 4), x_dir=(0, 0, -1), z_dir=(0, 1, 0))) as fillet2_piece_18:
        with BuildLine():
            CenterArc((FILLET2_R, -FILLET2_R), FILLET2_R, 90, 90)
            Line((0, -FILLET2_R), (-FILLET2_R * 0.02, -FILLET2_R))
            Line((-FILLET2_R * 0.02, -FILLET2_R), (-FILLET2_R * 0.02, FILLET2_R * 0.02))
            Line((-FILLET2_R * 0.02, FILLET2_R * 0.02), (FILLET2_R, FILLET2_R * 0.02))
            Line((FILLET2_R, FILLET2_R * 0.02), (FILLET2_R, 0))
        make_face()
    extrude(amount=3, mode=Mode.SUBTRACT)
    with BuildSketch(Plane(origin=(14, 4, 1.936491673), x_dir=(0, -1, 0), z_dir=(0, 0, 1))) as fillet2_piece_19a_section:
        with BuildLine():
            CenterArc((FILLET2_R, FILLET2_R), FILLET2_R, 180, 90)
            Line((0, FILLET2_R), (-FILLET2_R * 0.02, FILLET2_R))
            Line((-FILLET2_R * 0.02, FILLET2_R), (-FILLET2_R * 0.02, -FILLET2_R * 0.02))
            Line((-FILLET2_R * 0.02, -FILLET2_R * 0.02), (FILLET2_R, -FILLET2_R * 0.02))
            Line((FILLET2_R, -FILLET2_R * 0.02), (FILLET2_R, 0))
        make_face()
    fillet2_piece_19a = extrude(amount=3.563508327, mode=Mode.PRIVATE)
    fillet2_piece_19a = split(fillet2_piece_19a, bisect_by=Plane(origin=(14.226395114, 3.773604886, 3), z_dir=(0, 0, 1)), keep=Keep.TOP, mode=Mode.PRIVATE)
    with BuildSketch(Plane(origin=(16.5, 4, 3), x_dir=(0, -1, 0), z_dir=(-1, 0, 0))) as fillet2_piece_19b_section:
        with BuildLine():
            CenterArc((FILLET2_R, FILLET2_R), FILLET2_R, 180, 90)
            Line((0, FILLET2_R), (-FILLET2_R * 0.02, FILLET2_R))
            Line((-FILLET2_R * 0.02, FILLET2_R), (-FILLET2_R * 0.02, -FILLET2_R * 0.02))
            Line((-FILLET2_R * 0.02, -FILLET2_R * 0.02), (FILLET2_R, -FILLET2_R * 0.02))
            Line((FILLET2_R, -FILLET2_R * 0.02), (FILLET2_R, 0))
        make_face()
    fillet2_piece_19b = extrude(amount=15.5, mode=Mode.PRIVATE)
    fillet2_piece_19b = split(fillet2_piece_19b, bisect_by=Plane(origin=(14, 3.773604886, 3.226395114), z_dir=(1, 0, 0)), keep=Keep.TOP, mode=Mode.PRIVATE)
    fillet2_piece_19 = fillet2_piece_19a & fillet2_piece_19b
    add(fillet2_piece_19, mode=Mode.SUBTRACT)
    with BuildSketch(Plane(origin=(14, 4, 3), x_dir=(0, -1, 0), z_dir=(-1, 0, 0))) as fillet2_piece_20a_section:
        with BuildLine():
            CenterArc((FILLET2_R, FILLET2_R), FILLET2_R, 180, 90)
            Line((0, FILLET2_R), (-FILLET2_R * 0.02, FILLET2_R))
            Line((-FILLET2_R * 0.02, FILLET2_R), (-FILLET2_R * 0.02, -FILLET2_R * 0.02))
            Line((-FILLET2_R * 0.02, -FILLET2_R * 0.02), (FILLET2_R, -FILLET2_R * 0.02))
            Line((FILLET2_R, -FILLET2_R * 0.02), (FILLET2_R, 0))
        make_face()
    fillet2_piece_20a = extrude(amount=15.5, mode=Mode.PRIVATE)
    fillet2_piece_20a = split(fillet2_piece_20a, bisect_by=Plane(origin=(1, 3.773604886, 3.226395114), z_dir=(-1, 0, 0)), keep=Keep.TOP, mode=Mode.PRIVATE)
    with BuildSketch(Plane(origin=(1, 4, 5.5), x_dir=(0, -1, 0), z_dir=(0, 0, -1))) as fillet2_piece_20b_section:
        with BuildLine():
            CenterArc((FILLET2_R, FILLET2_R), FILLET2_R, 180, 90)
            Line((0, FILLET2_R), (-FILLET2_R * 0.02, FILLET2_R))
            Line((-FILLET2_R * 0.02, FILLET2_R), (-FILLET2_R * 0.02, -FILLET2_R * 0.02))
            Line((-FILLET2_R * 0.02, -FILLET2_R * 0.02), (FILLET2_R, -FILLET2_R * 0.02))
            Line((FILLET2_R, -FILLET2_R * 0.02), (FILLET2_R, 0))
        make_face()
    fillet2_piece_20b = extrude(amount=3.563508327, mode=Mode.PRIVATE)
    fillet2_piece_20b = split(fillet2_piece_20b, bisect_by=Plane(origin=(0.773604886, 3.773604886, 3), z_dir=(0, 0, 1)), keep=Keep.TOP, mode=Mode.PRIVATE)
    fillet2_piece_20 = fillet2_piece_20a & fillet2_piece_20b
    add(fillet2_piece_20, mode=Mode.SUBTRACT)
    with BuildSketch(Plane(origin=(1, 4, -21.936491673), x_dir=(0, -1, 0), z_dir=(0, 0, -1))) as fillet2_piece_21a_section:
        with BuildLine():
            CenterArc((FILLET2_R, FILLET2_R), FILLET2_R, 180, 90)
            Line((0, FILLET2_R), (-FILLET2_R * 0.02, FILLET2_R))
            Line((-FILLET2_R * 0.02, FILLET2_R), (-FILLET2_R * 0.02, -FILLET2_R * 0.02))
            Line((-FILLET2_R * 0.02, -FILLET2_R * 0.02), (FILLET2_R, -FILLET2_R * 0.02))
            Line((FILLET2_R, -FILLET2_R * 0.02), (FILLET2_R, 0))
        make_face()
    fillet2_piece_21a = extrude(amount=3.563508327, mode=Mode.PRIVATE)
    fillet2_piece_21a = split(fillet2_piece_21a, bisect_by=Plane(origin=(0.773604886, 3.773604886, -23), z_dir=(0, 0, -1)), keep=Keep.TOP, mode=Mode.PRIVATE)
    with BuildSketch(Plane(origin=(-1.5, 4, -23), x_dir=(0, -1, 0), z_dir=(1, 0, 0))) as fillet2_piece_21b_section:
        with BuildLine():
            CenterArc((FILLET2_R, FILLET2_R), FILLET2_R, 180, 90)
            Line((0, FILLET2_R), (-FILLET2_R * 0.02, FILLET2_R))
            Line((-FILLET2_R * 0.02, FILLET2_R), (-FILLET2_R * 0.02, -FILLET2_R * 0.02))
            Line((-FILLET2_R * 0.02, -FILLET2_R * 0.02), (FILLET2_R, -FILLET2_R * 0.02))
            Line((FILLET2_R, -FILLET2_R * 0.02), (FILLET2_R, 0))
        make_face()
    fillet2_piece_21b = extrude(amount=15.5, mode=Mode.PRIVATE)
    fillet2_piece_21b = split(fillet2_piece_21b, bisect_by=Plane(origin=(1, 3.773604886, -23.226395114), z_dir=(-1, 0, 0)), keep=Keep.TOP, mode=Mode.PRIVATE)
    fillet2_piece_21 = fillet2_piece_21a & fillet2_piece_21b
    add(fillet2_piece_21, mode=Mode.SUBTRACT)
    with BuildSketch(Plane(origin=(1, 4, -23), x_dir=(0, -1, 0), z_dir=(1, 0, 0))) as fillet2_piece_22a_section:
        with BuildLine():
            CenterArc((FILLET2_R, FILLET2_R), FILLET2_R, 180, 90)
            Line((0, FILLET2_R), (-FILLET2_R * 0.02, FILLET2_R))
            Line((-FILLET2_R * 0.02, FILLET2_R), (-FILLET2_R * 0.02, -FILLET2_R * 0.02))
            Line((-FILLET2_R * 0.02, -FILLET2_R * 0.02), (FILLET2_R, -FILLET2_R * 0.02))
            Line((FILLET2_R, -FILLET2_R * 0.02), (FILLET2_R, 0))
        make_face()
    fillet2_piece_22a = extrude(amount=15.5, mode=Mode.PRIVATE)
    fillet2_piece_22a = split(fillet2_piece_22a, bisect_by=Plane(origin=(14, 3.773604886, -23.226395114), z_dir=(1, 0, 0)), keep=Keep.TOP, mode=Mode.PRIVATE)
    with BuildSketch(Plane(origin=(14, 4, -25.5), x_dir=(0, -1, 0), z_dir=(0, 0, 1))) as fillet2_piece_22b_section:
        with BuildLine():
            CenterArc((FILLET2_R, FILLET2_R), FILLET2_R, 180, 90)
            Line((0, FILLET2_R), (-FILLET2_R * 0.02, FILLET2_R))
            Line((-FILLET2_R * 0.02, FILLET2_R), (-FILLET2_R * 0.02, -FILLET2_R * 0.02))
            Line((-FILLET2_R * 0.02, -FILLET2_R * 0.02), (FILLET2_R, -FILLET2_R * 0.02))
            Line((FILLET2_R, -FILLET2_R * 0.02), (FILLET2_R, 0))
        make_face()
    fillet2_piece_22b = extrude(amount=3.563508327, mode=Mode.PRIVATE)
    fillet2_piece_22b = split(fillet2_piece_22b, bisect_by=Plane(origin=(14.226395114, 3.773604886, -23), z_dir=(0, 0, -1)), keep=Keep.TOP, mode=Mode.PRIVATE)
    fillet2_piece_22 = fillet2_piece_22a & fillet2_piece_22b
    add(fillet2_piece_22, mode=Mode.SUBTRACT)


solid = part.part
